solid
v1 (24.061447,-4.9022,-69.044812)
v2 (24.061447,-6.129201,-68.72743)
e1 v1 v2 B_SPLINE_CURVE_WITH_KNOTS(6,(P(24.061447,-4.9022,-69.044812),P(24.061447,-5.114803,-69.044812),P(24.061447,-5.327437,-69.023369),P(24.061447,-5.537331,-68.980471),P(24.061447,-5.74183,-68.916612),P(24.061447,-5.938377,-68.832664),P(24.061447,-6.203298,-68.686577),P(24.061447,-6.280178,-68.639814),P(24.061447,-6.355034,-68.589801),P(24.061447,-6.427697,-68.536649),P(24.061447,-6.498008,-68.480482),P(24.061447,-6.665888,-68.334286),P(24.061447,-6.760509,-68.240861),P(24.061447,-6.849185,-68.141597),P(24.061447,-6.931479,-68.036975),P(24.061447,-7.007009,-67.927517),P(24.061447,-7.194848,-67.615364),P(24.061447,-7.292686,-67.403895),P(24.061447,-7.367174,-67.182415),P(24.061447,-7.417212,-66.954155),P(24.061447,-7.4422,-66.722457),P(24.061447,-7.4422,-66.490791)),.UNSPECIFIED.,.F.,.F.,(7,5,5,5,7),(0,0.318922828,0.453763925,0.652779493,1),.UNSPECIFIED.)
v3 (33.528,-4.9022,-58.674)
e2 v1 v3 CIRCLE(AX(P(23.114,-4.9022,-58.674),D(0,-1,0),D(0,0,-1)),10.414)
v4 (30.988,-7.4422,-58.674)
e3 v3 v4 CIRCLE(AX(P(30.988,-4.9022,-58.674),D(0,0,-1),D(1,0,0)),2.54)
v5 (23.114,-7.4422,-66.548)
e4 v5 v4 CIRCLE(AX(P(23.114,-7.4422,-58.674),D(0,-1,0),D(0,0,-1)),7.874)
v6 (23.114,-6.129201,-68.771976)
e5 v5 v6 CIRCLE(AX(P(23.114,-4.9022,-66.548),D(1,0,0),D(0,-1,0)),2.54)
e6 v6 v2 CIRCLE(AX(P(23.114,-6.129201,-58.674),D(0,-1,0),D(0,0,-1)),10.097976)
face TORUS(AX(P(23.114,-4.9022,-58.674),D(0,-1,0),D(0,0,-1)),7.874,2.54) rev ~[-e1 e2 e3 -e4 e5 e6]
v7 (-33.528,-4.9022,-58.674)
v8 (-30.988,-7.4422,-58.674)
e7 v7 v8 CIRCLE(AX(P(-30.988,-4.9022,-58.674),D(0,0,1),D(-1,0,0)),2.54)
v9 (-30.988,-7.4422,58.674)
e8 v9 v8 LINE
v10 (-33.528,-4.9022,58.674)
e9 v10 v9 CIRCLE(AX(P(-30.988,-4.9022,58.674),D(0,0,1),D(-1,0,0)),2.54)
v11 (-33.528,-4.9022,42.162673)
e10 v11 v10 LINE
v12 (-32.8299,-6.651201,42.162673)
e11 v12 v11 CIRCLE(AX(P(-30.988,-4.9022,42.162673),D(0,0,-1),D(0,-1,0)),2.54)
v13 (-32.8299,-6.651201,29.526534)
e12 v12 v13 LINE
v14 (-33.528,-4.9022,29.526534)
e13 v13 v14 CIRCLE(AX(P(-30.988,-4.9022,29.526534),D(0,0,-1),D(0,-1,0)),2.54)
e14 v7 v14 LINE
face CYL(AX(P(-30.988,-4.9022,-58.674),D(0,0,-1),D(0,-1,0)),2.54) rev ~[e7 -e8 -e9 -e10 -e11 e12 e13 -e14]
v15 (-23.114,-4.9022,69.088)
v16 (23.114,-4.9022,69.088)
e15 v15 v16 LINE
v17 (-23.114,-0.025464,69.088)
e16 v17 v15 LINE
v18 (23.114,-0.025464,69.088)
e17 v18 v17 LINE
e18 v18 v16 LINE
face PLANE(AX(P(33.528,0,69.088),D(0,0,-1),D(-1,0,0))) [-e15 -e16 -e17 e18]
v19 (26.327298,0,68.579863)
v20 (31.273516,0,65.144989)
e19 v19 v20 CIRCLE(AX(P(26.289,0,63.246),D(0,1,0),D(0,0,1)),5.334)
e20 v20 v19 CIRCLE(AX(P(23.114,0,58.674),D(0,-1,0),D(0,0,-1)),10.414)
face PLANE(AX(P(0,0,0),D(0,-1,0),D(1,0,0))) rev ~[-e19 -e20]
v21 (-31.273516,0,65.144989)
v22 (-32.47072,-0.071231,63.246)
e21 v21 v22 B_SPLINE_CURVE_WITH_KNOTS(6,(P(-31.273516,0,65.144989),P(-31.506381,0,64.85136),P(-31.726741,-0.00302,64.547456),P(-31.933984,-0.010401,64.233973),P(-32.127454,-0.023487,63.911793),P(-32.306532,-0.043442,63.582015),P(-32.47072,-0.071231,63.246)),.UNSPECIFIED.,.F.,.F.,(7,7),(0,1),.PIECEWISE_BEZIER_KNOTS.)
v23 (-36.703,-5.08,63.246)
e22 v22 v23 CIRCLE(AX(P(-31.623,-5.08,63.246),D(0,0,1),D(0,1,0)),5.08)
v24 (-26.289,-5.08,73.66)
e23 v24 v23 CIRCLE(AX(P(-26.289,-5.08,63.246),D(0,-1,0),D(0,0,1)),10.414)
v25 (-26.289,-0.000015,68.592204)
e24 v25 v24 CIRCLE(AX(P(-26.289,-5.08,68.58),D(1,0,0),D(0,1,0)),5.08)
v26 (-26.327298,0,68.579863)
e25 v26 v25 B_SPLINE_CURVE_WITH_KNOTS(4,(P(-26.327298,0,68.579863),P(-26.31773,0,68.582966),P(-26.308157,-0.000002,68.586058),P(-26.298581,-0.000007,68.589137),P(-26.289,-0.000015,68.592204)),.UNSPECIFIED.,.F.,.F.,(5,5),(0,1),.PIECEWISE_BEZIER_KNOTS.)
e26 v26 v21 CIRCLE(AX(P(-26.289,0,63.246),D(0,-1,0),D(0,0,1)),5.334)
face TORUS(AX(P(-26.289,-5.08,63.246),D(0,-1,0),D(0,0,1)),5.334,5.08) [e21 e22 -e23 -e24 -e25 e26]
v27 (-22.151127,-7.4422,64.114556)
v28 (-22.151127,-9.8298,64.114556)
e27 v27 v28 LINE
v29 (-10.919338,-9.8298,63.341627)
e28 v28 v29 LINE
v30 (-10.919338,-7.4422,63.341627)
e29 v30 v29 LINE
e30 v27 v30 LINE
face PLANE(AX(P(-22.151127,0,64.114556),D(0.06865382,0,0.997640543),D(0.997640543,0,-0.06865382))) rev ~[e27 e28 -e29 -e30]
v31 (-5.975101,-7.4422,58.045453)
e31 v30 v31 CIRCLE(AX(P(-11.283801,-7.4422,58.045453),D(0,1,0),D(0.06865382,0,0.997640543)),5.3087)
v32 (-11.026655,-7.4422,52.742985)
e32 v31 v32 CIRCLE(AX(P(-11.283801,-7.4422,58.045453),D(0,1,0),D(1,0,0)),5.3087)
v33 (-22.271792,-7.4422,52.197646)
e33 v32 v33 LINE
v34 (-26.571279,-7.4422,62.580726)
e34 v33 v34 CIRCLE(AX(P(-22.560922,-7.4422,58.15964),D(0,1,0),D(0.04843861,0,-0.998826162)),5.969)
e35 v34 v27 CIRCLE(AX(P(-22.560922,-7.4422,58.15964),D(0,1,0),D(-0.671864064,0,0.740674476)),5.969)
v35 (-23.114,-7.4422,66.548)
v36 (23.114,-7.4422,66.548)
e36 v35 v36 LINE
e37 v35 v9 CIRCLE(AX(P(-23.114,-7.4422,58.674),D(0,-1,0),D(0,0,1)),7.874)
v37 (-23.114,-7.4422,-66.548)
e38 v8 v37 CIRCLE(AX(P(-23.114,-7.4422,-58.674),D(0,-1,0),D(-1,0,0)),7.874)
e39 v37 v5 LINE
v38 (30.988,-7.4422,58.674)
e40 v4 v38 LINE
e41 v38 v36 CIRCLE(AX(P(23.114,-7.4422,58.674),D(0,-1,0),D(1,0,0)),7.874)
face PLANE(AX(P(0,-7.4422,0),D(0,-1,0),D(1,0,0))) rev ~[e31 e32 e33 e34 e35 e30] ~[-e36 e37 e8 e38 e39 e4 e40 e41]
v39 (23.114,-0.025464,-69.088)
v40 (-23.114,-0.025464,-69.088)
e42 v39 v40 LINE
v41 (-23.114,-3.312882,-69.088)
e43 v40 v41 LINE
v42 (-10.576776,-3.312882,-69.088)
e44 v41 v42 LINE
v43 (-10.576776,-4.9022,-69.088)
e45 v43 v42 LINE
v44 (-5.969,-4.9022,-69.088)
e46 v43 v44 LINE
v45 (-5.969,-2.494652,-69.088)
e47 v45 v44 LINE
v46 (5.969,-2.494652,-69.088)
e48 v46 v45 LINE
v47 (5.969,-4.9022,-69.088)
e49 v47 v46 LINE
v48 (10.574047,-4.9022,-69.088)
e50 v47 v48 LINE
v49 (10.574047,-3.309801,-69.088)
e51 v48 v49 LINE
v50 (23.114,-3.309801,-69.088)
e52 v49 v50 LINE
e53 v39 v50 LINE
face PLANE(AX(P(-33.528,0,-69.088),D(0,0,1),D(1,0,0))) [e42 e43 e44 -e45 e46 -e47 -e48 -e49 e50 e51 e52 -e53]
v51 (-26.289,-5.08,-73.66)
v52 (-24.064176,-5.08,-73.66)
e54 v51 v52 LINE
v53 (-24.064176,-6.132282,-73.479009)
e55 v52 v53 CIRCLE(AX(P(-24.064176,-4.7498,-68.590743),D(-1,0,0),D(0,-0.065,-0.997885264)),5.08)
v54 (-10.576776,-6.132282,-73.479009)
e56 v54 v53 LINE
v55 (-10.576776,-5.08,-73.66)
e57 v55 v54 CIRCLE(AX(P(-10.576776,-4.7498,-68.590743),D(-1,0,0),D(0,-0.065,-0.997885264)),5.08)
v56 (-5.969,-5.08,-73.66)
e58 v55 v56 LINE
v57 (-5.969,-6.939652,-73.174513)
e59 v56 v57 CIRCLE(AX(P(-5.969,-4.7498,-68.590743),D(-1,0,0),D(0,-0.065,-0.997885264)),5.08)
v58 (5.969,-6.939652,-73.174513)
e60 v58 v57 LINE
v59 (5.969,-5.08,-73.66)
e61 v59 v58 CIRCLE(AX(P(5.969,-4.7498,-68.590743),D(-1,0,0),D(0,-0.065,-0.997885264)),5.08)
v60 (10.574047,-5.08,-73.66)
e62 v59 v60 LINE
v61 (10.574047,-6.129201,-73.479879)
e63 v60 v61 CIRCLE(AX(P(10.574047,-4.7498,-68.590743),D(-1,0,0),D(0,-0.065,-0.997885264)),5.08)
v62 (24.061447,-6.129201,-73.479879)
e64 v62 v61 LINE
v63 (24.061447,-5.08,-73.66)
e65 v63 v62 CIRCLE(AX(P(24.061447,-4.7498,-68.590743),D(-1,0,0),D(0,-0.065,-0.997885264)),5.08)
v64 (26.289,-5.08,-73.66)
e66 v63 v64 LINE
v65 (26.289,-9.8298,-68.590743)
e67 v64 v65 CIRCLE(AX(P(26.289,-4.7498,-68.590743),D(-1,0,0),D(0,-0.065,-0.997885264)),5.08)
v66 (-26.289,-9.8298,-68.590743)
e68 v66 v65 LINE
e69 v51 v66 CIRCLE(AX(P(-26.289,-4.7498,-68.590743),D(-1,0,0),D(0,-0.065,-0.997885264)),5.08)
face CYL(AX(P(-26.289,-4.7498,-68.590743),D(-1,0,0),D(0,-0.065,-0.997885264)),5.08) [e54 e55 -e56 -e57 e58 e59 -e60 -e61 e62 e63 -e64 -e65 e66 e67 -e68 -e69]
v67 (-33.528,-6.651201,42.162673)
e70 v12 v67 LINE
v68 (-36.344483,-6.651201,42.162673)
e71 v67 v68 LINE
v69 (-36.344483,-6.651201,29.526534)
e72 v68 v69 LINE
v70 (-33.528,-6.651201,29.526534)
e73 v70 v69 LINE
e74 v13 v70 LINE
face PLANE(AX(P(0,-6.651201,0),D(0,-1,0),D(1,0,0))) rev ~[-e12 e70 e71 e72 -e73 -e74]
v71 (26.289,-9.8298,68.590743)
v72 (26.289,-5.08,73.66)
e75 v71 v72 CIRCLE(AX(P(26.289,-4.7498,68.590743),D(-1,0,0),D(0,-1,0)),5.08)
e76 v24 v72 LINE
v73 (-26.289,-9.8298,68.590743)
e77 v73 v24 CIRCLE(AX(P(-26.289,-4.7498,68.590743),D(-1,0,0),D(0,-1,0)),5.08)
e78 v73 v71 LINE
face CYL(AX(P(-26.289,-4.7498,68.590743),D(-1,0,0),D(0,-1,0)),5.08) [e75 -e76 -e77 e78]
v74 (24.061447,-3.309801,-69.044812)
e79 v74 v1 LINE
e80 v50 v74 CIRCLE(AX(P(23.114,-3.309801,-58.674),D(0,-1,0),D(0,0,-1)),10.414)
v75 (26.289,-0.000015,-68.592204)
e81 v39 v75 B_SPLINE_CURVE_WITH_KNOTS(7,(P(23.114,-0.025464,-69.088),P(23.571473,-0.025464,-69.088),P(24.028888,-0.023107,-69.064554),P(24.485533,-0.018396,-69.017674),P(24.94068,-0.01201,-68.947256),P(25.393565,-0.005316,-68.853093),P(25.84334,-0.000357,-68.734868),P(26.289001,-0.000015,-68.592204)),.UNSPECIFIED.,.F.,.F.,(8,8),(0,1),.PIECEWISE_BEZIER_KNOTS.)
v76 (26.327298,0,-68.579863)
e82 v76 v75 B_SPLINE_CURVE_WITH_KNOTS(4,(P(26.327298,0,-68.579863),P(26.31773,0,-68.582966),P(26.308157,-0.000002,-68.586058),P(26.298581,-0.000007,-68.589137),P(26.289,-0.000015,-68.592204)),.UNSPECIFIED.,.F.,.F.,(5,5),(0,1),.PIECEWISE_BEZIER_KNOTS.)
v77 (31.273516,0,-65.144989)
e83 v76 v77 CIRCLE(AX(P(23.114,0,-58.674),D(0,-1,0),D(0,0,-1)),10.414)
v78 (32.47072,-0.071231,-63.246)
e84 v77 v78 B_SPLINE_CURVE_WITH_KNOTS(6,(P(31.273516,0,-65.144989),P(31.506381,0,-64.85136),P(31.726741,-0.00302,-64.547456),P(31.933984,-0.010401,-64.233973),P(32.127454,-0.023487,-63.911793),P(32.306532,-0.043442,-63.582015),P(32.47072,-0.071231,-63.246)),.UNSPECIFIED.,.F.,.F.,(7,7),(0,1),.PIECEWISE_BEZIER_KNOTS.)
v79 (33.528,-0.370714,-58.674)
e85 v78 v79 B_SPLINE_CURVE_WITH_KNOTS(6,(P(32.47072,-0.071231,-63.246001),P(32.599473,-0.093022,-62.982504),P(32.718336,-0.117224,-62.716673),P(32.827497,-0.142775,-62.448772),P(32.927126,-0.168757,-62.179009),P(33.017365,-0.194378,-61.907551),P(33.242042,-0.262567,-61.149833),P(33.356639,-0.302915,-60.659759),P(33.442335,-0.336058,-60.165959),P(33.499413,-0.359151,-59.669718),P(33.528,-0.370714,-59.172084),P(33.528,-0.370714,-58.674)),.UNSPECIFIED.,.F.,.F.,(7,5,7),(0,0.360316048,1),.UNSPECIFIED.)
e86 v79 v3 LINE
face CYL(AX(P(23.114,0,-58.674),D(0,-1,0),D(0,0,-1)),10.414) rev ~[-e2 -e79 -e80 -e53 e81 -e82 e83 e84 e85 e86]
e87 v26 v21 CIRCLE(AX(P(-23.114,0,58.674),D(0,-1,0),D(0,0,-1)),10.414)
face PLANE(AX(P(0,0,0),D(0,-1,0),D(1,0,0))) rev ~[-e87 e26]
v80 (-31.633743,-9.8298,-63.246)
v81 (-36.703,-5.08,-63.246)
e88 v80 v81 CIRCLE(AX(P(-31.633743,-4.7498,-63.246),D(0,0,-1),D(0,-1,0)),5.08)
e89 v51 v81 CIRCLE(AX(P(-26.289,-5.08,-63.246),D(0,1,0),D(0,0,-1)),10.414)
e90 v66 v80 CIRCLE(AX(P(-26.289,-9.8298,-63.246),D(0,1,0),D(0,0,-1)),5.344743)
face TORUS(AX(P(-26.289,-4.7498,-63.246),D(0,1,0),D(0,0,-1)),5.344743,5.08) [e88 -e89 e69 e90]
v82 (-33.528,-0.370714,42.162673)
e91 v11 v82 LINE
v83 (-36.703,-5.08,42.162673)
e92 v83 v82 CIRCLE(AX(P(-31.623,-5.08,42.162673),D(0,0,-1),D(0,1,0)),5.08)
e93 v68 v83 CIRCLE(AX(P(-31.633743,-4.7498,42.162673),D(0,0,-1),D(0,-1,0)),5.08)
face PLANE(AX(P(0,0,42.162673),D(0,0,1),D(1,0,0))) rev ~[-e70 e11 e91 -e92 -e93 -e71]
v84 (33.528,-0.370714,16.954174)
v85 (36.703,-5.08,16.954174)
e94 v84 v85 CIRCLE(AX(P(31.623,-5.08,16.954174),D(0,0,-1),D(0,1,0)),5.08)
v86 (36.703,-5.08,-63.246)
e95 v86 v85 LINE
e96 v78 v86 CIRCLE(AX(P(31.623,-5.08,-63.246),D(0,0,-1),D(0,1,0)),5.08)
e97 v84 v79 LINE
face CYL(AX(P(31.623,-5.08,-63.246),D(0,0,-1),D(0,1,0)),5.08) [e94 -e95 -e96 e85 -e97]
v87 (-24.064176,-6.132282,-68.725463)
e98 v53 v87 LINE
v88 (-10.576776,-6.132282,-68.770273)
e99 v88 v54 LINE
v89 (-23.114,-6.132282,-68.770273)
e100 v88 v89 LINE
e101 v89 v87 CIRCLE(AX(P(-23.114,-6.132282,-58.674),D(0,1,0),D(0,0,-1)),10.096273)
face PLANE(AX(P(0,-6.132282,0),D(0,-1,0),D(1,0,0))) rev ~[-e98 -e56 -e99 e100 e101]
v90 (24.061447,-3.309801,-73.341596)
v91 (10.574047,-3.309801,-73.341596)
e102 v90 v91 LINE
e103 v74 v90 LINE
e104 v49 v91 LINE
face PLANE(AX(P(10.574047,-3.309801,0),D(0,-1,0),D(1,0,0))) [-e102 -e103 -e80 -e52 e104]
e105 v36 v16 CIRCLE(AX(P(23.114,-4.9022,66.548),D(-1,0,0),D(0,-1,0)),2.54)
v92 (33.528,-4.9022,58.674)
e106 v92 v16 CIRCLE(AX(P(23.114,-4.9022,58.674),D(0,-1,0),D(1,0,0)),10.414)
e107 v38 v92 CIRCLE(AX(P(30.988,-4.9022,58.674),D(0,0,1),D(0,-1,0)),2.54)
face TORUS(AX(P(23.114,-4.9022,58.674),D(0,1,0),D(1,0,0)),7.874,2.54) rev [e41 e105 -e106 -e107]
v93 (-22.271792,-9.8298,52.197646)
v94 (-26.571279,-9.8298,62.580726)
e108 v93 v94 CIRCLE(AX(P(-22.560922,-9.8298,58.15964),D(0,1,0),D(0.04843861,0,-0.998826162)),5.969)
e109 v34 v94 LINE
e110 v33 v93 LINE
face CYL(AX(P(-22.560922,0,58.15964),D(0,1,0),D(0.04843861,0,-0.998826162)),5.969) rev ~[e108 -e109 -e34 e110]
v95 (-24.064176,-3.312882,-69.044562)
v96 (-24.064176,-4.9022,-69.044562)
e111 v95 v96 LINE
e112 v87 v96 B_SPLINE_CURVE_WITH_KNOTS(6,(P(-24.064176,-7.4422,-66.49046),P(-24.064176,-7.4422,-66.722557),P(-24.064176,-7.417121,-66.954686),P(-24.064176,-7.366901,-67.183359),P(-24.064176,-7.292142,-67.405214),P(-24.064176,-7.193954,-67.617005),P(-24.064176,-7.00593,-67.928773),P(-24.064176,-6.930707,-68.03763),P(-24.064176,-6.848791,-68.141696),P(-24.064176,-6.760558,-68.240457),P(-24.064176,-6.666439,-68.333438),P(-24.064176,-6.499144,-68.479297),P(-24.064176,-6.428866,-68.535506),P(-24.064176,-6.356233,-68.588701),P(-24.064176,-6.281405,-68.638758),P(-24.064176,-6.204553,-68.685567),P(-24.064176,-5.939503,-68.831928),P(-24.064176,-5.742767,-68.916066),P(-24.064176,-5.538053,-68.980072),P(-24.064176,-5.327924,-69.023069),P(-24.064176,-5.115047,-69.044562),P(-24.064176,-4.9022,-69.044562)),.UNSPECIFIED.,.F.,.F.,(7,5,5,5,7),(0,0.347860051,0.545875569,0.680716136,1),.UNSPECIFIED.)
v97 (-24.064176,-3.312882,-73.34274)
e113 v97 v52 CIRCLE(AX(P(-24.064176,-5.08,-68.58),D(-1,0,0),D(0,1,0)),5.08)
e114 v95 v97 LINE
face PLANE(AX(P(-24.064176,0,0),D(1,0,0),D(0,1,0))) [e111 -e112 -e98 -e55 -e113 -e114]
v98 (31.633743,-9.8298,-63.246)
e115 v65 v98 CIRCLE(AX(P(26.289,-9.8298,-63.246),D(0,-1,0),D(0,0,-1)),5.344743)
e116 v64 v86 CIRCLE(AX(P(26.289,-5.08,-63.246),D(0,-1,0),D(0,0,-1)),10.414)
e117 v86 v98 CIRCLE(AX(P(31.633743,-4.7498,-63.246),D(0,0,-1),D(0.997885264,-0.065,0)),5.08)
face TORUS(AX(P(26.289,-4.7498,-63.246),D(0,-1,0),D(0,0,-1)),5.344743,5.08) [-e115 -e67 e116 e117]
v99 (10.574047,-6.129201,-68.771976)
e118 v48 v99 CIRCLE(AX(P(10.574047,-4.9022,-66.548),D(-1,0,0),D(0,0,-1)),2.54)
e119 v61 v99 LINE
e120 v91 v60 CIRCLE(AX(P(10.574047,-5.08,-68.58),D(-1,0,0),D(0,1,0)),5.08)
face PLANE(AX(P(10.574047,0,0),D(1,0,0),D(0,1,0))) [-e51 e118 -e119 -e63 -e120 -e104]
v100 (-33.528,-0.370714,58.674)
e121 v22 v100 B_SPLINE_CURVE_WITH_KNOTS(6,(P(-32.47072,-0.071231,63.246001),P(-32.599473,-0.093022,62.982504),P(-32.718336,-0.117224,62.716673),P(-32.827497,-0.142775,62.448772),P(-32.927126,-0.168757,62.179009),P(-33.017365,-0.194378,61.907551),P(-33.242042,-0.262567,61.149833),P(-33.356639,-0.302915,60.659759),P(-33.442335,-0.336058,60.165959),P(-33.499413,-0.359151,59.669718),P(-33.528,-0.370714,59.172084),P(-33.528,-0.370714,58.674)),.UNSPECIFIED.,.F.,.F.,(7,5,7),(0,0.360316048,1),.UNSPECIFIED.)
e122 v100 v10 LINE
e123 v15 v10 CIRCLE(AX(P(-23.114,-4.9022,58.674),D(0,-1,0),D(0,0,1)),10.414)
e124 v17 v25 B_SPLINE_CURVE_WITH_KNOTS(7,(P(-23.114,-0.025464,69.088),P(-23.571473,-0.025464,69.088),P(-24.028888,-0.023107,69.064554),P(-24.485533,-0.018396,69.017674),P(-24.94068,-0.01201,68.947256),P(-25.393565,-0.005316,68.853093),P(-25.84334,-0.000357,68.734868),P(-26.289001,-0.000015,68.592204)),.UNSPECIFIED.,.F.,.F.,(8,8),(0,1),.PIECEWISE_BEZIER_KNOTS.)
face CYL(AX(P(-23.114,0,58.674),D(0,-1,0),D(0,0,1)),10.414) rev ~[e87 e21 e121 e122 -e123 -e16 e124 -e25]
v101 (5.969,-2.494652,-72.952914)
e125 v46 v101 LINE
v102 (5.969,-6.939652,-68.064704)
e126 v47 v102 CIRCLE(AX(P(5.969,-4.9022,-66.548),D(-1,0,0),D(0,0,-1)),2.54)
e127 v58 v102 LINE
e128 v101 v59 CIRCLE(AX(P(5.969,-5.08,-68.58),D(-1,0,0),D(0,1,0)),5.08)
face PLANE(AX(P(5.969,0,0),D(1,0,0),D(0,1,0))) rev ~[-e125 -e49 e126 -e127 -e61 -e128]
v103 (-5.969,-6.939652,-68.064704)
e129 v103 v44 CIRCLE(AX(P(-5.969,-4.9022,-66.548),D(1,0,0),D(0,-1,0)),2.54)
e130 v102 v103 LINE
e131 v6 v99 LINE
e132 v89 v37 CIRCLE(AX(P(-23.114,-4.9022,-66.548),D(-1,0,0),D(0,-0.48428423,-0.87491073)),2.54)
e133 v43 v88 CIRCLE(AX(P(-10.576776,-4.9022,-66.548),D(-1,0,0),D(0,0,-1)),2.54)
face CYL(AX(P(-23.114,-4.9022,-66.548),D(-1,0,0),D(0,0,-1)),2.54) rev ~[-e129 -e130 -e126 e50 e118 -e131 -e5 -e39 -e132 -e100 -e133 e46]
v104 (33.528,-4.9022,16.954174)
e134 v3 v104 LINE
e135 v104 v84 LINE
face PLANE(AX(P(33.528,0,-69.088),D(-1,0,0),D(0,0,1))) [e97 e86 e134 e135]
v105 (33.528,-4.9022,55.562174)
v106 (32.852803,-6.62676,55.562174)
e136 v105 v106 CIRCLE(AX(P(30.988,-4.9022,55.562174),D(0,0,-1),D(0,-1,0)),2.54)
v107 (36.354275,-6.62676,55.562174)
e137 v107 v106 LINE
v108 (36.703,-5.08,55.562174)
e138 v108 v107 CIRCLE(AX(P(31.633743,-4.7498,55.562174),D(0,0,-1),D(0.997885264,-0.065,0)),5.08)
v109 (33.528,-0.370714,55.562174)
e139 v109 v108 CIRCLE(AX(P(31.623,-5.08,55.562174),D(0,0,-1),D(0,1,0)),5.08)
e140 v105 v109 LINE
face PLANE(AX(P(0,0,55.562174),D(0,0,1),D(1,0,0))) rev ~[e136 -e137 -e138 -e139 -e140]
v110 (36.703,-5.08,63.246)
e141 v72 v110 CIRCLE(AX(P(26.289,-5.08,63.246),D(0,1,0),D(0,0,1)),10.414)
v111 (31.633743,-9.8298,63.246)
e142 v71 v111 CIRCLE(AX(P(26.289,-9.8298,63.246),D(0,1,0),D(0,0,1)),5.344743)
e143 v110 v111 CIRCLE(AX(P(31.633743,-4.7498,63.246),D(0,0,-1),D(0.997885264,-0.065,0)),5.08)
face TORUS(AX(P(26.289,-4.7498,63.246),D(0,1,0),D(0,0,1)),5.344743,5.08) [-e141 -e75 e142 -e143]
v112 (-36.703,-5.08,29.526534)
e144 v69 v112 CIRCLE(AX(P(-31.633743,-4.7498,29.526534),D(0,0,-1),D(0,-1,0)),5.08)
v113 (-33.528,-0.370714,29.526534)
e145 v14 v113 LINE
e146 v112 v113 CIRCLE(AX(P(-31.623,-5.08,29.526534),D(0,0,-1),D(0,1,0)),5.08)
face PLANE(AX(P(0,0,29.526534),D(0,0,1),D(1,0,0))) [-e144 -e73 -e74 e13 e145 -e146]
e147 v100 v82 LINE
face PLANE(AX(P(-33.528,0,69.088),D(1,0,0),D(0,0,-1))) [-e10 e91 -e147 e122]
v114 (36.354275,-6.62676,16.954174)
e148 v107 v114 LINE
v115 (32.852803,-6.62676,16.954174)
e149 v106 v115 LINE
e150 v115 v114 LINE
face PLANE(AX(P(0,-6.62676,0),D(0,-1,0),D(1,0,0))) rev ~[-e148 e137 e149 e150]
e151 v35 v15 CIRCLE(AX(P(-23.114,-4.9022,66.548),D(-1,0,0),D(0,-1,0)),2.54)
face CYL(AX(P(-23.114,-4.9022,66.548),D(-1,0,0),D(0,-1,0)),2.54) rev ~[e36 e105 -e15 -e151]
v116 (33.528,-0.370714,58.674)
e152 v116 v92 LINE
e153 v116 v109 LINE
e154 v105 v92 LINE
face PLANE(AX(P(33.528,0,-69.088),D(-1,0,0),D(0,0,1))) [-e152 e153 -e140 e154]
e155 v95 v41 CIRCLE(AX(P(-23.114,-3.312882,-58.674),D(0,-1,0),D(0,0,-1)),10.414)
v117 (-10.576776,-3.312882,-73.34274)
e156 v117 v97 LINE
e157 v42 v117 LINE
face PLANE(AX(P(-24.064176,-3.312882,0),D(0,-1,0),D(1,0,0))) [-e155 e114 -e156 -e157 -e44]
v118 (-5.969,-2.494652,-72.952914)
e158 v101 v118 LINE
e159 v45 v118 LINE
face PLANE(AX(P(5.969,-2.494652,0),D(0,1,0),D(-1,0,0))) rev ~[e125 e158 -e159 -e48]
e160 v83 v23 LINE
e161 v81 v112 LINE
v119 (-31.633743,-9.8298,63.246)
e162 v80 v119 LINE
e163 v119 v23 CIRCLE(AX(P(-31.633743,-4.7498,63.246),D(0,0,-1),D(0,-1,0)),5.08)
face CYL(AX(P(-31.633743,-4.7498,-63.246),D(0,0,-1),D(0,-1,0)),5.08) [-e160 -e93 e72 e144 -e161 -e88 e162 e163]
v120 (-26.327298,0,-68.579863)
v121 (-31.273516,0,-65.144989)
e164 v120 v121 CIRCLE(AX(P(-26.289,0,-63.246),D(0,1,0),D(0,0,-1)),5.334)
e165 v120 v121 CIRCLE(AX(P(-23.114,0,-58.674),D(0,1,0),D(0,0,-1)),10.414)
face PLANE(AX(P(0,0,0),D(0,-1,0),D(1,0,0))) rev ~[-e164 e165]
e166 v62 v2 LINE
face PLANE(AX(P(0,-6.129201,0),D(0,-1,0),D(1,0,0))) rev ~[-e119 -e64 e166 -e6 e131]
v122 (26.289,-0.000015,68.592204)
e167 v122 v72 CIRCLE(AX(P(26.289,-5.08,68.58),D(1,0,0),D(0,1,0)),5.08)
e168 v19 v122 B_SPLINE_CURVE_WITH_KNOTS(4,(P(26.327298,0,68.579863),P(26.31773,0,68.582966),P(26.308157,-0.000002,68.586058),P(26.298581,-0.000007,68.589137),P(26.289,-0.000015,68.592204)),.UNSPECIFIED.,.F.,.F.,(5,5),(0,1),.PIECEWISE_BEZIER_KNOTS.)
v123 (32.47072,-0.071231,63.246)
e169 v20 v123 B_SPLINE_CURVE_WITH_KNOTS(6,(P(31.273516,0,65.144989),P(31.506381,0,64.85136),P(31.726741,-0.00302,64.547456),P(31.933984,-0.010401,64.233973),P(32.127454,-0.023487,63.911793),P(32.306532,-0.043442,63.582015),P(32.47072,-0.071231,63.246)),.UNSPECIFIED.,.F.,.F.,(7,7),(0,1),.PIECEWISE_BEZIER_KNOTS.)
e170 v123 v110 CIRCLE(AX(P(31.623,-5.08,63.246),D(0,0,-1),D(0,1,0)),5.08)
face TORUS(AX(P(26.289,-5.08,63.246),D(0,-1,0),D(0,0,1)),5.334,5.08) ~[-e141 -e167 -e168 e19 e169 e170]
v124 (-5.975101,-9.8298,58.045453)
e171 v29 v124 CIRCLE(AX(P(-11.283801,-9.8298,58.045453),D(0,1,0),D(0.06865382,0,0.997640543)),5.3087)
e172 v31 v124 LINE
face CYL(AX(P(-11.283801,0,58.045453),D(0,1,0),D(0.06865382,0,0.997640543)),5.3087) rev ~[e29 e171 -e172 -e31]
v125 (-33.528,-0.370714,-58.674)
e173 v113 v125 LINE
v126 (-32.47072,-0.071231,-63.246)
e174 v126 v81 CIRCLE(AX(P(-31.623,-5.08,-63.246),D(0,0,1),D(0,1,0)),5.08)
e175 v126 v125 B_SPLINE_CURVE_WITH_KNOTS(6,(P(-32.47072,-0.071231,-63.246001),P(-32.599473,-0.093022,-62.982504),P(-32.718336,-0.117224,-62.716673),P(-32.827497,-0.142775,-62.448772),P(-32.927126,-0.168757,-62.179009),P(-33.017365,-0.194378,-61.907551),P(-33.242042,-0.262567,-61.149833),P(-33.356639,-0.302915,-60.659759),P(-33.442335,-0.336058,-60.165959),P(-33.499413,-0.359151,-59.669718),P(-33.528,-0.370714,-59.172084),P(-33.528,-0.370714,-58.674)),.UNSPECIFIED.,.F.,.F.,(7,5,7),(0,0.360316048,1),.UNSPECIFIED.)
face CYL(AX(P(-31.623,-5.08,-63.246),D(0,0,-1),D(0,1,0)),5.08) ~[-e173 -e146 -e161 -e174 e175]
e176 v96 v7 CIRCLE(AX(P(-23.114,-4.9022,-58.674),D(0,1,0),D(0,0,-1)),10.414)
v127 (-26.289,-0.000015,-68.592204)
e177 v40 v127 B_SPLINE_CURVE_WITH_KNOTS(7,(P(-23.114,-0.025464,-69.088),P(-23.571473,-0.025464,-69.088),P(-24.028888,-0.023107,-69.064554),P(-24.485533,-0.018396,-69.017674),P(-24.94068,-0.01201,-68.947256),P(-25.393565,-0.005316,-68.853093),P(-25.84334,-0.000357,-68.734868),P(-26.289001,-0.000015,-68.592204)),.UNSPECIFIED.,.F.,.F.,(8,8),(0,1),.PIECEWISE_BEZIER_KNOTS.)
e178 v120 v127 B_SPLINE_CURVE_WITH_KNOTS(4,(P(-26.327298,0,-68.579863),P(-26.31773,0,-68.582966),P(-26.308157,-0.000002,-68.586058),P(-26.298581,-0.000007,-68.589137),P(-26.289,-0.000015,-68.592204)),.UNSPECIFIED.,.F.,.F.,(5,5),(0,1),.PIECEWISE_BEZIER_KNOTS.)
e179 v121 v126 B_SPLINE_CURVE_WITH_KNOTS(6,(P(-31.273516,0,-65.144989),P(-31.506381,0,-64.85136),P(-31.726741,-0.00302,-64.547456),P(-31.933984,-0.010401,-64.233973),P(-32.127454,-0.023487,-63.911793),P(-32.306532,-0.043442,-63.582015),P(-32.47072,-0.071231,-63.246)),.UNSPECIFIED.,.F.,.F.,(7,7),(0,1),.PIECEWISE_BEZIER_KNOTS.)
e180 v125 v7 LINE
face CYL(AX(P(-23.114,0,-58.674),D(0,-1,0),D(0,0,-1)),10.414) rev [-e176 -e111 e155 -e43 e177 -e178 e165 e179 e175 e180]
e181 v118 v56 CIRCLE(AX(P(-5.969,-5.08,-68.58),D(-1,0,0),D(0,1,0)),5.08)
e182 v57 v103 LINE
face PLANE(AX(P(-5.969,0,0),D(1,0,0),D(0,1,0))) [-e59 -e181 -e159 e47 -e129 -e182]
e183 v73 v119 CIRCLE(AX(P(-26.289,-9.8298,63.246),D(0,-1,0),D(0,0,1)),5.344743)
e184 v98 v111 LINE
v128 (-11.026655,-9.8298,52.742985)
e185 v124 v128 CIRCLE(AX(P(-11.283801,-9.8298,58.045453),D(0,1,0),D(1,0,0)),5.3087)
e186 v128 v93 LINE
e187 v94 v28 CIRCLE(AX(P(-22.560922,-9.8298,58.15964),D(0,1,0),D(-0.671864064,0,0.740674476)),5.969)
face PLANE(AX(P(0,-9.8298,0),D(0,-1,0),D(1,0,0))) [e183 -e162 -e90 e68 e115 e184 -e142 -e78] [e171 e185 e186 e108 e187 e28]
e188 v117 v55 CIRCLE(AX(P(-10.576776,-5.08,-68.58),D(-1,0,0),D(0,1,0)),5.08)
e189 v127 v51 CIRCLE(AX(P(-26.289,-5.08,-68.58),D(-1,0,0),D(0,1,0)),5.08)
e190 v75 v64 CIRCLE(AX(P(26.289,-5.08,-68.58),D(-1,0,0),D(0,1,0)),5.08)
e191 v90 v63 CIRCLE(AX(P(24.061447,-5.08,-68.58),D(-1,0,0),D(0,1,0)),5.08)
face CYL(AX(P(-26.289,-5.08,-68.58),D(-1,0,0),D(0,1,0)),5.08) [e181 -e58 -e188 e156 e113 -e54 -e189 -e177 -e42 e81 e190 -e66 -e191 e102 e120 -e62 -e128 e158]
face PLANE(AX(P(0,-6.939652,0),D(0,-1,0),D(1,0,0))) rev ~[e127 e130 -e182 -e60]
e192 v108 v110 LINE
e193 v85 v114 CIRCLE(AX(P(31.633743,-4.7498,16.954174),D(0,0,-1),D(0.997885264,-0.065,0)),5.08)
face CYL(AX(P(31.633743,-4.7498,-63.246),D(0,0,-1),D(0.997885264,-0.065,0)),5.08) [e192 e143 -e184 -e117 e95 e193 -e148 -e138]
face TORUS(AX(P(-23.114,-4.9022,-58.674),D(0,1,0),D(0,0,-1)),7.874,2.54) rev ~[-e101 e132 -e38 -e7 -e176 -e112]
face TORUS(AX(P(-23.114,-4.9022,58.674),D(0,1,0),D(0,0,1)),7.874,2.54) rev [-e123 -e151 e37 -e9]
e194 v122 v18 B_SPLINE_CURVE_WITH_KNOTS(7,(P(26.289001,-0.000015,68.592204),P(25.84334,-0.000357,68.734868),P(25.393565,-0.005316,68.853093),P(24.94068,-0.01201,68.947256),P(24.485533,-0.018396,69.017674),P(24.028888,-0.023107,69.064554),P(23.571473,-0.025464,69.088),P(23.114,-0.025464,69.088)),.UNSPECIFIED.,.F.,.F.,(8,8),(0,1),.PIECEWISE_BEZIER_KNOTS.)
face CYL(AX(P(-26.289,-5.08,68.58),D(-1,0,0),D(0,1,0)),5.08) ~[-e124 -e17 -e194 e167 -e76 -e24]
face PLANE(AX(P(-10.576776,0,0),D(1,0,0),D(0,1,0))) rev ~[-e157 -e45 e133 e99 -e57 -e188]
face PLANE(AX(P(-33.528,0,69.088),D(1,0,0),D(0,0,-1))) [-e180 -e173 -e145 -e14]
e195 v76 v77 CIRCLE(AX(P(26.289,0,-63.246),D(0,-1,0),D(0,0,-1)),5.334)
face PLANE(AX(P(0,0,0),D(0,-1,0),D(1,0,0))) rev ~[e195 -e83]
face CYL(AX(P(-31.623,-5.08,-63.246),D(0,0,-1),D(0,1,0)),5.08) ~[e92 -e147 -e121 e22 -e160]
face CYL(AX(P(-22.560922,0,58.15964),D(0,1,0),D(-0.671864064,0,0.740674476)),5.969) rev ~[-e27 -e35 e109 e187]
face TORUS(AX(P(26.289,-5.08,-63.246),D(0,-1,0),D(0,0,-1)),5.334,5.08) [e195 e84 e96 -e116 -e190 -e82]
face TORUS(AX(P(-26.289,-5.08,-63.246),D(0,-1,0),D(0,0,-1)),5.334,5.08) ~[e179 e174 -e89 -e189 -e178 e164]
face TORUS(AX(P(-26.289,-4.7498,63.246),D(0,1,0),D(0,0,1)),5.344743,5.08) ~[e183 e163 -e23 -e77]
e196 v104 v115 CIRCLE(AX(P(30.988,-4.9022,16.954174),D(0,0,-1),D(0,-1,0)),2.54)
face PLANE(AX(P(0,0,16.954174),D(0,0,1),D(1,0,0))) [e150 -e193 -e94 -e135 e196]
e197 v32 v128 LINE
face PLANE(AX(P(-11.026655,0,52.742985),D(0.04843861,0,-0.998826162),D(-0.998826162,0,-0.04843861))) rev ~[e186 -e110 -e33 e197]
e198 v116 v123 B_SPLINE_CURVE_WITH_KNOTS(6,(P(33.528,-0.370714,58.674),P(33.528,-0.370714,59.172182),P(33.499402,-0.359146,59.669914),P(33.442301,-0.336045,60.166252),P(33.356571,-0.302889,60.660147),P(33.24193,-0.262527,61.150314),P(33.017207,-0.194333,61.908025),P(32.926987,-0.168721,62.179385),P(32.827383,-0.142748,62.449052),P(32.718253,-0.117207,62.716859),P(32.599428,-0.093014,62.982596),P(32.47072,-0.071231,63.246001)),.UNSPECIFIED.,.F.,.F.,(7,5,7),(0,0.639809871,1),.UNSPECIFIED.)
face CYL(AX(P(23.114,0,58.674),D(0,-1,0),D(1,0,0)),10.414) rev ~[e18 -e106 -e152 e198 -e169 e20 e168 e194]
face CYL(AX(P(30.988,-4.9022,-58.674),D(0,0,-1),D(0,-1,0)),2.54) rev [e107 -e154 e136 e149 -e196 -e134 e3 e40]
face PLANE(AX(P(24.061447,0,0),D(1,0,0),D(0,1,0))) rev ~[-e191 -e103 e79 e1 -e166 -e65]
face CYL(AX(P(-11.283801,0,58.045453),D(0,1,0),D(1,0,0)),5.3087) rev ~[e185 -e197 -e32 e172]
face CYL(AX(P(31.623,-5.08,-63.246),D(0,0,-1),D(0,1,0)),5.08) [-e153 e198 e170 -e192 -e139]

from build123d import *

# Parameters (mm, degrees)
F1_DEPTH      = 9.8298
F2_R          = 10.414
F4_DEPTH      = 7.4422
F6_R          = 10.414
F7_DEPTH      = 25.4
F8_T1_DEPTH   = 126.492
F8_T3_DEPTH   = 52.578
F8_T6_ANGLE   = 90
F8_T8_ANGLE   = 90
F8_T10_ANGLE  = 90
F8_T12_ANGLE  = 90
F9_T1_DEPTH   = 126.492
F9_T3_DEPTH   = 52.578
F9_T6_ANGLE   = 90
F9_T8_ANGLE   = 90
F9_T10_ANGLE  = 90
F9_T12_ANGLE  = 90
F10_W         = 13.4874
F10_H         = 2.8194
F11_DEPTH     = 76.2
F12_W         = 6.6548
F12_H         = 38.608
F13_DEPTH     = 36.7040001
F14_W         = 6.6548
F14_H         = 12.6361389041
F15_DEPTH     = 36.7040001
F16_T1_DEPTH  = 46.228
F16_T6_DEPTH  = 117.348
F16_T11_DEPTH = 117.348
F16_T16_DEPTH = 117.348
F16_T21_ANGLE = 90
F16_T26_ANGLE = 90
F16_T31_ANGLE = 90
F16_T36_ANGLE = 90
F16_T41_DEPTH = 117.348
F16_T46_DEPTH = 117.348
F16_T51_DEPTH = 117.348
F16_T54_ANGLE = 90
F16_T56_ANGLE = 90
F16_T60_DEPTH = 46.228
F16_T66_DEPTH = 46.228
F16_T72_DEPTH = 46.228
F16_T78_DEPTH = 46.228
F16_T83_DEPTH = 46.228


# Not quite as in the source:
# - a fillet or chamfer that OpenCascade refuses, or shapes differently, is made with other operations: its cross-section is extruded or revolved along the edge and cut away or added


with BuildPart() as f1:
    # F0 (on Front) → F1 (new body)
    with BuildSketch(Plane.XZ):
        Polygon((-36.703, -73.66), (36.703, -73.66), (36.703, 73.66), (-26.8460772932, 73.66), (-36.703, 73.66), (-36.703, 59.1852668802), align=None)
        with BuildLine():
            ThreePointArc((-22.2717920435, 52.197646321), (-28.0758079345, 55.8760032584), (-26.5712787061, 62.5807256257))
            ThreePointArc((-26.5712787061, 62.5807256257), (-24.5177487597, 63.7987699714), (-22.1511274544, 64.1145560806))
            Line((-22.1511274544, 64.1145560806), (-10.919338154, 63.3416271462))
            ThreePointArc((-10.919338154, 63.3416271462), (-7.4032650854, 61.6681227759), (-5.9751011246, 58.0454532626))
            ThreePointArc((-5.9751011246, 58.0454532626), (-7.4401434327, 54.3836791207), (-11.0266546305, 52.7429852861))
            Line((-11.0266546305, 52.7429852861), (-22.2717920435, 52.197646321))
        make_face(mode=Mode.SUBTRACT)
    extrude(amount=F1_DEPTH)

    # F2
    f2_edges = [f1.edges().sort_by_distance(p)[0] for p in [
        (36.703, -4.9149, -73.66),
        (36.703, -4.9149, 73.66),
        (-36.703, -4.9149, -73.66),
        (-36.703, -4.9149, 73.66),
    ]]
    fillet(f2_edges, radius=F2_R)

    # F3 (on Front) → F4 (cut)
    with BuildSketch(Plane.XZ):
        Polygon((-33.528, -69.088), (33.528, -69.088), (33.528, 69.088), (-6.3646039926, 69.088), (-33.528, 69.088), (-33.528, -30.0187896937), align=None)
    extrude(amount=F4_DEPTH, mode=Mode.SUBTRACT)

    # F6
    f6_edges = [f1.edges().sort_by_distance(p)[0] for p in [
        (-33.528, -3.7211, 69.088),
        (33.528, -3.7211, 69.088),
        (33.528, -3.7211, -69.088),
        (-33.528, -3.7211, -69.088),
    ]]
    fillet(f6_edges, radius=F6_R)

    # F5 (on Front) → F7 (cut)
    with BuildSketch(Plane.XZ):
        with BuildLine():
            ThreePointArc((17.3579254917, 58.6583771845), (17.3582830329, 58.7237086352), (17.3593556135, 58.7890322592))
            ThreePointArc((17.3593556135, 58.7890322592), (15.6509202483, 62.5470328924), (11.7595014779, 63.924777466))
            ThreePointArc((11.7595014779, 63.924777466), (8.2403525747, 62.2726218117), (6.8081294482, 58.6583771845))
            Line((6.8081294482, 58.6583771845), (17.3579254917, 58.6583771845))
        make_face()
        with BuildLine():
            ThreePointArc((17.3593556135, 58.5277221098), (17.3582830329, 58.5930457338), (17.3579254917, 58.6583771845))
            Line((17.3579254917, 58.6583771845), (6.8081294482, 58.6583771845))
            ThreePointArc((6.8081294482, 58.6583771845), (8.2403525747, 55.0441325573), (11.7595014779, 53.3919769031))
            ThreePointArc((11.7595014779, 53.3919769031), (15.6509202483, 54.7697214767), (17.3593556135, 58.5277221098))
        make_face()
        with BuildLine():
            Line((11.7595014779, 53.3919769031), (22.9592097491, 52.7007143766))
            ThreePointArc((22.9592097491, 52.7007143766), (19.0231520596, 54.5223772758), (17.3593556135, 58.5277221098))
            ThreePointArc((17.3593556135, 58.5277221098), (15.6509202483, 54.7697214767), (11.7595014779, 53.3919769031))
        make_face()
        with BuildLine():
            ThreePointArc((17.3593556135, 58.7890322592), (19.0231520596, 62.7943770932), (22.9592097491, 64.6160399924))
            Line((22.9592097491, 64.6160399924), (11.7595014779, 63.924777466))
            ThreePointArc((11.7595014779, 63.924777466), (15.6509202483, 62.5470328924), (17.3593556135, 58.7890322592))
        make_face()
    extrude(amount=-F7_DEPTH, mode=Mode.SUBTRACT)

    # F8: fillet of radius 5.08 on 1 edges, made by hand

    # F8_s2 → F8_t1 (cut)
    with BuildSketch(Plane.XY.offset(-63.246)):
        with BuildLine():
            ThreePointArc((-31.623, 0), (-35.2151024484, -1.4878975516), (-36.703, -5.08))
            Line((-36.703, -5.08), (-36.703, 0))
            Line((-36.703, 0), (-31.623, 0))
        make_face()
        with BuildLine():
            ThreePointArc((31.623, 0), (35.2151024484, -1.4878975516), (36.703, -5.08))
            Line((36.703, -5.08), (36.703, 0))
            Line((36.703, 0), (31.623, 0))
        make_face()
    extrude(amount=F8_T1_DEPTH, mode=Mode.SUBTRACT)

    # F8_s4 → F8_t3 (cut)
    with BuildSketch(Plane.YZ.offset(-26.289)):
        with BuildLine():
            ThreePointArc((0, -68.58), (-1.4878975516, -72.1721024484), (-5.08, -73.66))
            Line((-5.08, -73.66), (0, -73.66))
            Line((0, -73.66), (0, -68.58))
        make_face()
        with BuildLine():
            ThreePointArc((0, 68.58), (-1.4878975516, 72.1721024484), (-5.08, 73.66))
            Line((-5.08, 73.66), (0, 73.66))
            Line((0, 73.66), (0, 68.58))
        make_face()
    extrude(amount=F8_T3_DEPTH, mode=Mode.SUBTRACT)

    # F8_s5 → F8_t6 (revolve, cut)
    with BuildSketch(Plane.YZ.offset(-26.289)):
        with BuildLine():
            ThreePointArc((0, 68.58), (-1.4878975516, 72.1721024484), (-5.08, 73.66))
            Line((-5.08, 73.66), (0, 73.66))
            Line((0, 73.66), (0, 68.58))
        make_face()
    revolve(axis=Axis((-26.289, 0, 63.246), (0, -1, 0)), revolution_arc=F8_T6_ANGLE, mode=Mode.SUBTRACT)

    # F8_s7 → F8_t8 (revolve, cut)
    with BuildSketch(Plane.YZ.offset(-26.289)):
        with BuildLine():
            ThreePointArc((0, -68.58), (-1.4878975516, -72.1721024484), (-5.08, -73.66))
            Line((-5.08, -73.66), (0, -73.66))
            Line((0, -73.66), (0, -68.58))
        make_face()
    revolve(axis=Axis((-26.289, 0, -63.246), (0, 1, 0)), revolution_arc=F8_T8_ANGLE, mode=Mode.SUBTRACT)

    # F8_s9 → F8_t10 (revolve, cut)
    with BuildSketch(Plane.YZ.offset(26.289)):
        with BuildLine():
            ThreePointArc((0, -68.58), (-1.4878975516, -72.1721024484), (-5.08, -73.66))
            Line((-5.08, -73.66), (0, -73.66))
            Line((0, -73.66), (0, -68.58))
        make_face()
    revolve(axis=Axis((26.289, 0, -63.246), (0, -1, 0)), revolution_arc=F8_T10_ANGLE, mode=Mode.SUBTRACT)

    # F8_s11 → F8_t12 (revolve, cut)
    with BuildSketch(Plane.YZ.offset(26.289)):
        with BuildLine():
            ThreePointArc((0, 68.58), (-1.4878975516, 72.1721024484), (-5.08, 73.66))
            Line((-5.08, 73.66), (0, 73.66))
            Line((0, 73.66), (0, 68.58))
        make_face()
    revolve(axis=Axis((26.289, 0, 63.246), (0, 1, 0)), revolution_arc=F8_T12_ANGLE, mode=Mode.SUBTRACT)

    # F9: fillet of radius 5.08 on 1 edges, made by hand

    # F9_s2 → F9_t1 (cut)
    with BuildSketch(Plane.XY.offset(-63.246)):
        with BuildLine():
            ThreePointArc((-31.6337428592, -9.8298), (-35.1071406193, -8.4568079579), (-36.703, -5.08))
            Line((-36.703, -5.08), (-36.703, -9.8298))
            Line((-36.703, -9.8298), (-31.6337428592, -9.8298))
        make_face()
        with BuildLine():
            ThreePointArc((36.703, -5.08), (35.1071406193, -8.4568079579), (31.6337428592, -9.8298))
            Line((31.6337428592, -9.8298), (36.703, -9.8298))
            Line((36.703, -9.8298), (36.703, -5.08))
        make_face()
    extrude(amount=F9_T1_DEPTH, mode=Mode.SUBTRACT)

    # F9_s4 → F9_t3 (cut)
    with BuildSketch(Plane.YZ.offset(-26.289)):
        with BuildLine():
            ThreePointArc((-9.8298, 68.5907428592), (-8.4568079579, 72.0641406193), (-5.08, 73.66))
            Line((-5.08, 73.66), (-9.8298, 73.66))
            Line((-9.8298, 73.66), (-9.8298, 68.5907428592))
        make_face()
        with BuildLine():
            ThreePointArc((-5.08, -73.66), (-8.4568079579, -72.0641406193), (-9.8298, -68.5907428592))
            Line((-9.8298, -68.5907428592), (-9.8298, -73.66))
            Line((-9.8298, -73.66), (-5.08, -73.66))
        make_face()
    extrude(amount=F9_T3_DEPTH, mode=Mode.SUBTRACT)

    # F9_s5 → F9_t6 (revolve, cut)
    with BuildSketch(Plane.YZ.offset(-26.289)):
        with BuildLine():
            ThreePointArc((-9.8298, -68.5907428592), (-8.4568079579, -72.0641406193), (-5.08, -73.66))
            Line((-5.08, -73.66), (-9.8298, -73.66))
            Line((-9.8298, -73.66), (-9.8298, -68.5907428592))
        make_face()
    revolve(axis=Axis((-26.289, -9.8298, -63.246), (0, 1, 0)), revolution_arc=F9_T6_ANGLE, mode=Mode.SUBTRACT)

    # F9_s7 → F9_t8 (revolve, cut)
    with BuildSketch(Plane.YZ.offset(-26.289)):
        with BuildLine():
            ThreePointArc((-9.8298, 68.5907428592), (-8.4568079579, 72.0641406193), (-5.08, 73.66))
            Line((-5.08, 73.66), (-9.8298, 73.66))
            Line((-9.8298, 73.66), (-9.8298, 68.5907428592))
        make_face()
    revolve(axis=Axis((-26.289, -9.8298, 63.246), (0, -1, 0)), revolution_arc=F9_T8_ANGLE, mode=Mode.SUBTRACT)

    # F9_s9 → F9_t10 (revolve, cut)
    with BuildSketch(Plane.YZ.offset(26.289)):
        with BuildLine():
            ThreePointArc((-9.8298, 68.5907428592), (-8.4568079579, 72.0641406193), (-5.08, 73.66))
            Line((-5.08, 73.66), (-9.8298, 73.66))
            Line((-9.8298, 73.66), (-9.8298, 68.5907428592))
        make_face()
    revolve(axis=Axis((26.289, -9.8298, 63.246), (0, 1, 0)), revolution_arc=F9_T10_ANGLE, mode=Mode.SUBTRACT)

    # F9_s11 → F9_t12 (revolve, cut)
    with BuildSketch(Plane.YZ.offset(26.289)):
        with BuildLine():
            ThreePointArc((-5.08, -73.66), (-8.4568079579, -72.0641406193), (-9.8298, -68.5907428592))
            Line((-9.8298, -68.5907428592), (-9.8298, -73.66))
            Line((-9.8298, -73.66), (-5.08, -73.66))
        make_face()
    revolve(axis=Axis((26.289, -9.8298, -63.246), (0, -1, 0)), revolution_arc=F9_T12_ANGLE, mode=Mode.SUBTRACT)

    # F10 (on Top) → F11 (cut)
    with BuildSketch(Plane.XY):
        Polygon((5.969, -5.0798957236), (5.969, -2.4946516344), (-5.969, -2.4946516344), (-5.969, -6.9396516344), (5.969, -6.9396516344), align=None)
        with Locations((-17.3204755411, -4.7225819435)):
            Rectangle(F10_W, F10_H)
        with Locations((17.3177467659, -4.7195008956)):
            Rectangle(F10_W, F10_H)
    extrude(amount=-F11_DEPTH, mode=Mode.SUBTRACT)

    # F12 (on Right) → F13 (cut, through all)
    with BuildSketch(Plane.YZ):
        with Locations((-3.2993604145, 36.2581742837)):
            Rectangle(F12_W, F12_H)
    extrude(amount=F13_DEPTH, mode=Mode.SUBTRACT)

    # F14 (on Right) → F15 (cut, through all)
    with BuildSketch(Plane.YZ):
        with Locations((-3.3238013398, 35.8446035534)):
            Rectangle(F14_W, F14_H)
    extrude(amount=-F15_DEPTH, mode=Mode.SUBTRACT)

    # F16: fillet of radius 2.54 on 7 edges, made by hand

    # F16_s2 → F16_t1 (join)
    with BuildSketch(Plane.YZ.offset(-23.114)):
        with BuildLine():
            ThreePointArc((-7.4422, 66.548), (-6.6982512242, 68.3440512242), (-4.9022, 69.088))
            Line((-4.9022, 69.088), (-7.4422, 69.088))
            Line((-7.4422, 69.088), (-7.4422, 66.548))
        make_face()
    extrude(amount=F16_T1_DEPTH)


with BuildPart() as f16_tool4:
    # F16_s5 → F16_t6 (new body)
    with BuildSketch(Plane.XY.offset(-58.674)):
        with BuildLine():
            ThreePointArc((-30.988, -7.4422), (-32.7840512242, -6.6982512242), (-33.528, -4.9022))
            Line((-33.528, -4.9022), (-33.528, -7.4422))
            Line((-33.528, -7.4422), (-30.988, -7.4422))
        make_face()
    extrude(amount=F16_T6_DEPTH)

    split(bisect_by=Plane.XZ.offset(6.6512013398), keep=Keep.TOP)


with BuildPart() as f1_1:
    add(f1.part)

    # F16_t3: union F16_tool4
    add(f16_tool4.part)


with BuildPart() as f16_tool9:
    # F16_s10 → F16_t11 (new body)
    with BuildSketch(Plane.XY.offset(-58.674)):
        with BuildLine():
            ThreePointArc((-30.988, -7.4422), (-32.7840512242, -6.6982512242), (-33.528, -4.9022))
            Line((-33.528, -4.9022), (-33.528, -7.4422))
            Line((-33.528, -7.4422), (-30.988, -7.4422))
        make_face()
    extrude(amount=F16_T11_DEPTH)

    split(bisect_by=Plane.XY.offset(29.5265341014), keep=Keep.BOTTOM)


with BuildPart() as f1_2:
    add(f1_1.part)

    # F16_t8: union F16_tool9
    add(f16_tool9.part)


with BuildPart() as f16_tool14:
    # F16_s15 → F16_t16 (new body)
    with BuildSketch(Plane.XY.offset(-58.674)):
        with BuildLine():
            ThreePointArc((-30.988, -7.4422), (-32.7840512242, -6.6982512242), (-33.528, -4.9022))
            Line((-33.528, -4.9022), (-33.528, -7.4422))
            Line((-33.528, -7.4422), (-30.988, -7.4422))
        make_face()
    extrude(amount=F16_T16_DEPTH)

    split(bisect_by=Plane.XY.offset(42.1626730055), keep=Keep.TOP)


with BuildPart() as f1_3:
    add(f1_2.part)

    # F16_t13: union F16_tool14
    add(f16_tool14.part)


with BuildPart() as f16_tool19:
    # F16_s20 → F16_t21 (revolve)
    with BuildSketch(Plane.YZ.offset(23.114)):
        with BuildLine():
            ThreePointArc((-4.9022, -69.088), (-6.6982512242, -68.3440512242), (-7.4422, -66.548))
            Line((-7.4422, -66.548), (-7.4422, -69.088))
            Line((-7.4422, -69.088), (-4.9022, -69.088))
        make_face()
    revolve(axis=Axis((23.114, -7.4422, -58.674), (0, -1, 0)), revolution_arc=F16_T21_ANGLE)

    split(bisect_by=Plane.XZ.offset(6.1292008956), keep=Keep.TOP)


with BuildPart() as f1_4:
    add(f1_3.part)

    # F16_t18: union F16_tool19
    add(f16_tool19.part)


with BuildPart() as f16_tool24:
    # F16_s25 → F16_t26 (revolve)
    with BuildSketch(Plane.YZ.offset(23.114)):
        with BuildLine():
            ThreePointArc((-4.9022, -69.088), (-6.6982512242, -68.3440512242), (-7.4422, -66.548))
            Line((-7.4422, -66.548), (-7.4422, -69.088))
            Line((-7.4422, -69.088), (-4.9022, -69.088))
        make_face()
    revolve(axis=Axis((23.114, -7.4422, -58.674), (0, -1, 0)), revolution_arc=F16_T26_ANGLE)

    split(bisect_by=Plane.YZ.offset(24.0614467659), keep=Keep.TOP)


with BuildPart() as f1_5:
    add(f1_4.part)

    # F16_t23: union F16_tool24
    add(f16_tool24.part)


with BuildPart() as f16_tool29:
    # F16_s30 → F16_t31 (revolve)
    with BuildSketch(Plane.YZ.offset(-23.114)):
        with BuildLine():
            ThreePointArc((-7.4422, -66.548), (-6.6982512242, -68.3440512242), (-4.9022, -69.088))
            Line((-4.9022, -69.088), (-7.4422, -69.088))
            Line((-7.4422, -69.088), (-7.4422, -66.548))
        make_face()
    revolve(axis=Axis((-23.114, -7.4422, -58.674), (0, 1, 0)), revolution_arc=F16_T31_ANGLE)

    split(bisect_by=Plane.XZ.offset(6.1322819435), keep=Keep.TOP)


with BuildPart() as f1_6:
    add(f1_5.part)

    # F16_t28: union F16_tool29
    add(f16_tool29.part)


with BuildPart() as f16_tool34:
    # F16_s35 → F16_t36 (revolve)
    with BuildSketch(Plane.YZ.offset(-23.114)):
        with BuildLine():
            ThreePointArc((-7.4422, -66.548), (-6.6982512242, -68.3440512242), (-4.9022, -69.088))
            Line((-4.9022, -69.088), (-7.4422, -69.088))
            Line((-7.4422, -69.088), (-7.4422, -66.548))
        make_face()
    revolve(axis=Axis((-23.114, -7.4422, -58.674), (0, 1, 0)), revolution_arc=F16_T36_ANGLE)

    split(bisect_by=Plane.YZ.offset(-24.0641755411), keep=Keep.BOTTOM)


with BuildPart() as f1_7:
    add(f1_6.part)

    # F16_t33: union F16_tool34
    add(f16_tool34.part)


with BuildPart() as f16_tool39:
    # F16_s40 → F16_t41 (new body)
    with BuildSketch(Plane.XY.offset(-58.674)):
        with BuildLine():
            ThreePointArc((30.988, -7.4422), (32.7840512242, -6.6982512242), (33.528, -4.9022))
            Line((33.528, -4.9022), (33.528, -7.4422))
            Line((33.528, -7.4422), (30.988, -7.4422))
        make_face()
    extrude(amount=F16_T41_DEPTH)

    split(bisect_by=Plane.XZ.offset(6.6267604145), keep=Keep.TOP)


with BuildPart() as f1_8:
    add(f1_7.part)

    # F16_t38: union F16_tool39
    add(f16_tool39.part)


with BuildPart() as f16_tool44:
    # F16_s45 → F16_t46 (new body)
    with BuildSketch(Plane.XY.offset(-58.674)):
        with BuildLine():
            ThreePointArc((30.988, -7.4422), (32.7840512242, -6.6982512242), (33.528, -4.9022))
            Line((33.528, -4.9022), (33.528, -7.4422))
            Line((33.528, -7.4422), (30.988, -7.4422))
        make_face()
    extrude(amount=F16_T46_DEPTH)

    split(bisect_by=Plane.XY.offset(16.9541742837), keep=Keep.BOTTOM)


with BuildPart() as f1_9:
    add(f1_8.part)

    # F16_t43: union F16_tool44
    add(f16_tool44.part)


with BuildPart() as f16_tool49:
    # F16_s50 → F16_t51 (new body)
    with BuildSketch(Plane.XY.offset(-58.674)):
        with BuildLine():
            ThreePointArc((30.988, -7.4422), (32.7840512242, -6.6982512242), (33.528, -4.9022))
            Line((33.528, -4.9022), (33.528, -7.4422))
            Line((33.528, -7.4422), (30.988, -7.4422))
        make_face()
    extrude(amount=F16_T51_DEPTH)

    split(bisect_by=Plane.XY.offset(55.5621742837), keep=Keep.TOP)


with BuildPart() as f1_10:
    add(f1_9.part)

    # F16_t48: union F16_tool49
    add(f16_tool49.part)

    # F16_s53 → F16_t54 (revolve)
    with BuildSketch(Plane.YZ.offset(-23.114)):
        with BuildLine():
            ThreePointArc((-7.4422, 66.548), (-6.6982512242, 68.3440512242), (-4.9022, 69.088))
            Line((-4.9022, 69.088), (-7.4422, 69.088))
            Line((-7.4422, 69.088), (-7.4422, 66.548))
        make_face()
    revolve(axis=Axis((-23.114, -7.4422, 58.674), (0, -1, 0)), revolution_arc=F16_T54_ANGLE)

    # F16_s55 → F16_t56 (revolve)
    with BuildSketch(Plane.XY.offset(58.674)):
        with BuildLine():
            ThreePointArc((30.988, -7.4422), (32.7840512242, -6.6982512242), (33.528, -4.9022))
            Line((33.528, -4.9022), (33.528, -7.4422))
            Line((33.528, -7.4422), (30.988, -7.4422))
        make_face()
    revolve(axis=Axis((23.114, -7.4422, 58.674), (0, -1, 0)), revolution_arc=F16_T56_ANGLE)


with BuildPart() as f16_tool58:
    # F16_s59 → F16_t60 (new body)
    with BuildSketch(Plane.YZ.offset(-23.114)):
        with BuildLine():
            ThreePointArc((-4.9022, -69.088), (-6.6982512242, -68.3440512242), (-7.4422, -66.548))
            Line((-7.4422, -66.548), (-7.4422, -69.088))
            Line((-7.4422, -69.088), (-4.9022, -69.088))
        make_face()
    extrude(amount=F16_T60_DEPTH)

    split(bisect_by=Plane.YZ.offset(-10.5767755411), keep=Keep.TOP)

    split(bisect_by=Plane.YZ.offset(-5.969), keep=Keep.BOTTOM)


with BuildPart() as f1_11:
    add(f1_10.part)

    # F16_t57: union F16_tool58
    add(f16_tool58.part)


with BuildPart() as f16_tool64:
    # F16_s65 → F16_t66 (new body)
    with BuildSketch(Plane.YZ.offset(-23.114)):
        with BuildLine():
            ThreePointArc((-4.9022, -69.088), (-6.6982512242, -68.3440512242), (-7.4422, -66.548))
            Line((-7.4422, -66.548), (-7.4422, -69.088))
            Line((-7.4422, -69.088), (-4.9022, -69.088))
        make_face()
    extrude(amount=F16_T66_DEPTH)

    split(bisect_by=Plane.XZ.offset(6.1322819435), keep=Keep.TOP)

    split(bisect_by=Plane.YZ.offset(-5.969), keep=Keep.BOTTOM)


with BuildPart() as f1_12:
    add(f1_11.part)

    # F16_t63: union F16_tool64
    add(f16_tool64.part)


with BuildPart() as f16_tool70:
    # F16_s71 → F16_t72 (new body)
    with BuildSketch(Plane.YZ.offset(-23.114)):
        with BuildLine():
            ThreePointArc((-4.9022, -69.088), (-6.6982512242, -68.3440512242), (-7.4422, -66.548))
            Line((-7.4422, -66.548), (-7.4422, -69.088))
            Line((-7.4422, -69.088), (-4.9022, -69.088))
        make_face()
    extrude(amount=F16_T72_DEPTH)

    split(bisect_by=Plane.YZ.offset(10.5740467659), keep=Keep.BOTTOM)

    split(bisect_by=Plane.YZ.offset(5.969), keep=Keep.TOP)


with BuildPart() as f1_13:
    add(f1_12.part)

    # F16_t69: union F16_tool70
    add(f16_tool70.part)


with BuildPart() as f16_tool76:
    # F16_s77 → F16_t78 (new body)
    with BuildSketch(Plane.YZ.offset(-23.114)):
        with BuildLine():
            ThreePointArc((-4.9022, -69.088), (-6.6982512242, -68.3440512242), (-7.4422, -66.548))
            Line((-7.4422, -66.548), (-7.4422, -69.088))
            Line((-7.4422, -69.088), (-4.9022, -69.088))
        make_face()
    extrude(amount=F16_T78_DEPTH)

    split(bisect_by=Plane.XZ.offset(6.9396516344), keep=Keep.TOP)


with BuildPart() as f1_14:
    add(f1_13.part)

    # F16_t75: union F16_tool76
    add(f16_tool76.part)


with BuildPart() as f16_tool81:
    # F16_s82 → F16_t83 (new body)
    with BuildSketch(Plane.YZ.offset(-23.114)):
        with BuildLine():
            ThreePointArc((-4.9022, -69.088), (-6.6982512242, -68.3440512242), (-7.4422, -66.548))
            Line((-7.4422, -66.548), (-7.4422, -69.088))
            Line((-7.4422, -69.088), (-4.9022, -69.088))
        make_face()
    extrude(amount=F16_T83_DEPTH)

    split(bisect_by=Plane.XZ.offset(6.1292008956), keep=Keep.TOP)

    split(bisect_by=Plane.YZ.offset(5.969), keep=Keep.TOP)


with BuildPart() as f1_15:
    add(f1_14.part)

    # F16_t80: union F16_tool81
    add(f16_tool81.part)


solid = f1_15.part
